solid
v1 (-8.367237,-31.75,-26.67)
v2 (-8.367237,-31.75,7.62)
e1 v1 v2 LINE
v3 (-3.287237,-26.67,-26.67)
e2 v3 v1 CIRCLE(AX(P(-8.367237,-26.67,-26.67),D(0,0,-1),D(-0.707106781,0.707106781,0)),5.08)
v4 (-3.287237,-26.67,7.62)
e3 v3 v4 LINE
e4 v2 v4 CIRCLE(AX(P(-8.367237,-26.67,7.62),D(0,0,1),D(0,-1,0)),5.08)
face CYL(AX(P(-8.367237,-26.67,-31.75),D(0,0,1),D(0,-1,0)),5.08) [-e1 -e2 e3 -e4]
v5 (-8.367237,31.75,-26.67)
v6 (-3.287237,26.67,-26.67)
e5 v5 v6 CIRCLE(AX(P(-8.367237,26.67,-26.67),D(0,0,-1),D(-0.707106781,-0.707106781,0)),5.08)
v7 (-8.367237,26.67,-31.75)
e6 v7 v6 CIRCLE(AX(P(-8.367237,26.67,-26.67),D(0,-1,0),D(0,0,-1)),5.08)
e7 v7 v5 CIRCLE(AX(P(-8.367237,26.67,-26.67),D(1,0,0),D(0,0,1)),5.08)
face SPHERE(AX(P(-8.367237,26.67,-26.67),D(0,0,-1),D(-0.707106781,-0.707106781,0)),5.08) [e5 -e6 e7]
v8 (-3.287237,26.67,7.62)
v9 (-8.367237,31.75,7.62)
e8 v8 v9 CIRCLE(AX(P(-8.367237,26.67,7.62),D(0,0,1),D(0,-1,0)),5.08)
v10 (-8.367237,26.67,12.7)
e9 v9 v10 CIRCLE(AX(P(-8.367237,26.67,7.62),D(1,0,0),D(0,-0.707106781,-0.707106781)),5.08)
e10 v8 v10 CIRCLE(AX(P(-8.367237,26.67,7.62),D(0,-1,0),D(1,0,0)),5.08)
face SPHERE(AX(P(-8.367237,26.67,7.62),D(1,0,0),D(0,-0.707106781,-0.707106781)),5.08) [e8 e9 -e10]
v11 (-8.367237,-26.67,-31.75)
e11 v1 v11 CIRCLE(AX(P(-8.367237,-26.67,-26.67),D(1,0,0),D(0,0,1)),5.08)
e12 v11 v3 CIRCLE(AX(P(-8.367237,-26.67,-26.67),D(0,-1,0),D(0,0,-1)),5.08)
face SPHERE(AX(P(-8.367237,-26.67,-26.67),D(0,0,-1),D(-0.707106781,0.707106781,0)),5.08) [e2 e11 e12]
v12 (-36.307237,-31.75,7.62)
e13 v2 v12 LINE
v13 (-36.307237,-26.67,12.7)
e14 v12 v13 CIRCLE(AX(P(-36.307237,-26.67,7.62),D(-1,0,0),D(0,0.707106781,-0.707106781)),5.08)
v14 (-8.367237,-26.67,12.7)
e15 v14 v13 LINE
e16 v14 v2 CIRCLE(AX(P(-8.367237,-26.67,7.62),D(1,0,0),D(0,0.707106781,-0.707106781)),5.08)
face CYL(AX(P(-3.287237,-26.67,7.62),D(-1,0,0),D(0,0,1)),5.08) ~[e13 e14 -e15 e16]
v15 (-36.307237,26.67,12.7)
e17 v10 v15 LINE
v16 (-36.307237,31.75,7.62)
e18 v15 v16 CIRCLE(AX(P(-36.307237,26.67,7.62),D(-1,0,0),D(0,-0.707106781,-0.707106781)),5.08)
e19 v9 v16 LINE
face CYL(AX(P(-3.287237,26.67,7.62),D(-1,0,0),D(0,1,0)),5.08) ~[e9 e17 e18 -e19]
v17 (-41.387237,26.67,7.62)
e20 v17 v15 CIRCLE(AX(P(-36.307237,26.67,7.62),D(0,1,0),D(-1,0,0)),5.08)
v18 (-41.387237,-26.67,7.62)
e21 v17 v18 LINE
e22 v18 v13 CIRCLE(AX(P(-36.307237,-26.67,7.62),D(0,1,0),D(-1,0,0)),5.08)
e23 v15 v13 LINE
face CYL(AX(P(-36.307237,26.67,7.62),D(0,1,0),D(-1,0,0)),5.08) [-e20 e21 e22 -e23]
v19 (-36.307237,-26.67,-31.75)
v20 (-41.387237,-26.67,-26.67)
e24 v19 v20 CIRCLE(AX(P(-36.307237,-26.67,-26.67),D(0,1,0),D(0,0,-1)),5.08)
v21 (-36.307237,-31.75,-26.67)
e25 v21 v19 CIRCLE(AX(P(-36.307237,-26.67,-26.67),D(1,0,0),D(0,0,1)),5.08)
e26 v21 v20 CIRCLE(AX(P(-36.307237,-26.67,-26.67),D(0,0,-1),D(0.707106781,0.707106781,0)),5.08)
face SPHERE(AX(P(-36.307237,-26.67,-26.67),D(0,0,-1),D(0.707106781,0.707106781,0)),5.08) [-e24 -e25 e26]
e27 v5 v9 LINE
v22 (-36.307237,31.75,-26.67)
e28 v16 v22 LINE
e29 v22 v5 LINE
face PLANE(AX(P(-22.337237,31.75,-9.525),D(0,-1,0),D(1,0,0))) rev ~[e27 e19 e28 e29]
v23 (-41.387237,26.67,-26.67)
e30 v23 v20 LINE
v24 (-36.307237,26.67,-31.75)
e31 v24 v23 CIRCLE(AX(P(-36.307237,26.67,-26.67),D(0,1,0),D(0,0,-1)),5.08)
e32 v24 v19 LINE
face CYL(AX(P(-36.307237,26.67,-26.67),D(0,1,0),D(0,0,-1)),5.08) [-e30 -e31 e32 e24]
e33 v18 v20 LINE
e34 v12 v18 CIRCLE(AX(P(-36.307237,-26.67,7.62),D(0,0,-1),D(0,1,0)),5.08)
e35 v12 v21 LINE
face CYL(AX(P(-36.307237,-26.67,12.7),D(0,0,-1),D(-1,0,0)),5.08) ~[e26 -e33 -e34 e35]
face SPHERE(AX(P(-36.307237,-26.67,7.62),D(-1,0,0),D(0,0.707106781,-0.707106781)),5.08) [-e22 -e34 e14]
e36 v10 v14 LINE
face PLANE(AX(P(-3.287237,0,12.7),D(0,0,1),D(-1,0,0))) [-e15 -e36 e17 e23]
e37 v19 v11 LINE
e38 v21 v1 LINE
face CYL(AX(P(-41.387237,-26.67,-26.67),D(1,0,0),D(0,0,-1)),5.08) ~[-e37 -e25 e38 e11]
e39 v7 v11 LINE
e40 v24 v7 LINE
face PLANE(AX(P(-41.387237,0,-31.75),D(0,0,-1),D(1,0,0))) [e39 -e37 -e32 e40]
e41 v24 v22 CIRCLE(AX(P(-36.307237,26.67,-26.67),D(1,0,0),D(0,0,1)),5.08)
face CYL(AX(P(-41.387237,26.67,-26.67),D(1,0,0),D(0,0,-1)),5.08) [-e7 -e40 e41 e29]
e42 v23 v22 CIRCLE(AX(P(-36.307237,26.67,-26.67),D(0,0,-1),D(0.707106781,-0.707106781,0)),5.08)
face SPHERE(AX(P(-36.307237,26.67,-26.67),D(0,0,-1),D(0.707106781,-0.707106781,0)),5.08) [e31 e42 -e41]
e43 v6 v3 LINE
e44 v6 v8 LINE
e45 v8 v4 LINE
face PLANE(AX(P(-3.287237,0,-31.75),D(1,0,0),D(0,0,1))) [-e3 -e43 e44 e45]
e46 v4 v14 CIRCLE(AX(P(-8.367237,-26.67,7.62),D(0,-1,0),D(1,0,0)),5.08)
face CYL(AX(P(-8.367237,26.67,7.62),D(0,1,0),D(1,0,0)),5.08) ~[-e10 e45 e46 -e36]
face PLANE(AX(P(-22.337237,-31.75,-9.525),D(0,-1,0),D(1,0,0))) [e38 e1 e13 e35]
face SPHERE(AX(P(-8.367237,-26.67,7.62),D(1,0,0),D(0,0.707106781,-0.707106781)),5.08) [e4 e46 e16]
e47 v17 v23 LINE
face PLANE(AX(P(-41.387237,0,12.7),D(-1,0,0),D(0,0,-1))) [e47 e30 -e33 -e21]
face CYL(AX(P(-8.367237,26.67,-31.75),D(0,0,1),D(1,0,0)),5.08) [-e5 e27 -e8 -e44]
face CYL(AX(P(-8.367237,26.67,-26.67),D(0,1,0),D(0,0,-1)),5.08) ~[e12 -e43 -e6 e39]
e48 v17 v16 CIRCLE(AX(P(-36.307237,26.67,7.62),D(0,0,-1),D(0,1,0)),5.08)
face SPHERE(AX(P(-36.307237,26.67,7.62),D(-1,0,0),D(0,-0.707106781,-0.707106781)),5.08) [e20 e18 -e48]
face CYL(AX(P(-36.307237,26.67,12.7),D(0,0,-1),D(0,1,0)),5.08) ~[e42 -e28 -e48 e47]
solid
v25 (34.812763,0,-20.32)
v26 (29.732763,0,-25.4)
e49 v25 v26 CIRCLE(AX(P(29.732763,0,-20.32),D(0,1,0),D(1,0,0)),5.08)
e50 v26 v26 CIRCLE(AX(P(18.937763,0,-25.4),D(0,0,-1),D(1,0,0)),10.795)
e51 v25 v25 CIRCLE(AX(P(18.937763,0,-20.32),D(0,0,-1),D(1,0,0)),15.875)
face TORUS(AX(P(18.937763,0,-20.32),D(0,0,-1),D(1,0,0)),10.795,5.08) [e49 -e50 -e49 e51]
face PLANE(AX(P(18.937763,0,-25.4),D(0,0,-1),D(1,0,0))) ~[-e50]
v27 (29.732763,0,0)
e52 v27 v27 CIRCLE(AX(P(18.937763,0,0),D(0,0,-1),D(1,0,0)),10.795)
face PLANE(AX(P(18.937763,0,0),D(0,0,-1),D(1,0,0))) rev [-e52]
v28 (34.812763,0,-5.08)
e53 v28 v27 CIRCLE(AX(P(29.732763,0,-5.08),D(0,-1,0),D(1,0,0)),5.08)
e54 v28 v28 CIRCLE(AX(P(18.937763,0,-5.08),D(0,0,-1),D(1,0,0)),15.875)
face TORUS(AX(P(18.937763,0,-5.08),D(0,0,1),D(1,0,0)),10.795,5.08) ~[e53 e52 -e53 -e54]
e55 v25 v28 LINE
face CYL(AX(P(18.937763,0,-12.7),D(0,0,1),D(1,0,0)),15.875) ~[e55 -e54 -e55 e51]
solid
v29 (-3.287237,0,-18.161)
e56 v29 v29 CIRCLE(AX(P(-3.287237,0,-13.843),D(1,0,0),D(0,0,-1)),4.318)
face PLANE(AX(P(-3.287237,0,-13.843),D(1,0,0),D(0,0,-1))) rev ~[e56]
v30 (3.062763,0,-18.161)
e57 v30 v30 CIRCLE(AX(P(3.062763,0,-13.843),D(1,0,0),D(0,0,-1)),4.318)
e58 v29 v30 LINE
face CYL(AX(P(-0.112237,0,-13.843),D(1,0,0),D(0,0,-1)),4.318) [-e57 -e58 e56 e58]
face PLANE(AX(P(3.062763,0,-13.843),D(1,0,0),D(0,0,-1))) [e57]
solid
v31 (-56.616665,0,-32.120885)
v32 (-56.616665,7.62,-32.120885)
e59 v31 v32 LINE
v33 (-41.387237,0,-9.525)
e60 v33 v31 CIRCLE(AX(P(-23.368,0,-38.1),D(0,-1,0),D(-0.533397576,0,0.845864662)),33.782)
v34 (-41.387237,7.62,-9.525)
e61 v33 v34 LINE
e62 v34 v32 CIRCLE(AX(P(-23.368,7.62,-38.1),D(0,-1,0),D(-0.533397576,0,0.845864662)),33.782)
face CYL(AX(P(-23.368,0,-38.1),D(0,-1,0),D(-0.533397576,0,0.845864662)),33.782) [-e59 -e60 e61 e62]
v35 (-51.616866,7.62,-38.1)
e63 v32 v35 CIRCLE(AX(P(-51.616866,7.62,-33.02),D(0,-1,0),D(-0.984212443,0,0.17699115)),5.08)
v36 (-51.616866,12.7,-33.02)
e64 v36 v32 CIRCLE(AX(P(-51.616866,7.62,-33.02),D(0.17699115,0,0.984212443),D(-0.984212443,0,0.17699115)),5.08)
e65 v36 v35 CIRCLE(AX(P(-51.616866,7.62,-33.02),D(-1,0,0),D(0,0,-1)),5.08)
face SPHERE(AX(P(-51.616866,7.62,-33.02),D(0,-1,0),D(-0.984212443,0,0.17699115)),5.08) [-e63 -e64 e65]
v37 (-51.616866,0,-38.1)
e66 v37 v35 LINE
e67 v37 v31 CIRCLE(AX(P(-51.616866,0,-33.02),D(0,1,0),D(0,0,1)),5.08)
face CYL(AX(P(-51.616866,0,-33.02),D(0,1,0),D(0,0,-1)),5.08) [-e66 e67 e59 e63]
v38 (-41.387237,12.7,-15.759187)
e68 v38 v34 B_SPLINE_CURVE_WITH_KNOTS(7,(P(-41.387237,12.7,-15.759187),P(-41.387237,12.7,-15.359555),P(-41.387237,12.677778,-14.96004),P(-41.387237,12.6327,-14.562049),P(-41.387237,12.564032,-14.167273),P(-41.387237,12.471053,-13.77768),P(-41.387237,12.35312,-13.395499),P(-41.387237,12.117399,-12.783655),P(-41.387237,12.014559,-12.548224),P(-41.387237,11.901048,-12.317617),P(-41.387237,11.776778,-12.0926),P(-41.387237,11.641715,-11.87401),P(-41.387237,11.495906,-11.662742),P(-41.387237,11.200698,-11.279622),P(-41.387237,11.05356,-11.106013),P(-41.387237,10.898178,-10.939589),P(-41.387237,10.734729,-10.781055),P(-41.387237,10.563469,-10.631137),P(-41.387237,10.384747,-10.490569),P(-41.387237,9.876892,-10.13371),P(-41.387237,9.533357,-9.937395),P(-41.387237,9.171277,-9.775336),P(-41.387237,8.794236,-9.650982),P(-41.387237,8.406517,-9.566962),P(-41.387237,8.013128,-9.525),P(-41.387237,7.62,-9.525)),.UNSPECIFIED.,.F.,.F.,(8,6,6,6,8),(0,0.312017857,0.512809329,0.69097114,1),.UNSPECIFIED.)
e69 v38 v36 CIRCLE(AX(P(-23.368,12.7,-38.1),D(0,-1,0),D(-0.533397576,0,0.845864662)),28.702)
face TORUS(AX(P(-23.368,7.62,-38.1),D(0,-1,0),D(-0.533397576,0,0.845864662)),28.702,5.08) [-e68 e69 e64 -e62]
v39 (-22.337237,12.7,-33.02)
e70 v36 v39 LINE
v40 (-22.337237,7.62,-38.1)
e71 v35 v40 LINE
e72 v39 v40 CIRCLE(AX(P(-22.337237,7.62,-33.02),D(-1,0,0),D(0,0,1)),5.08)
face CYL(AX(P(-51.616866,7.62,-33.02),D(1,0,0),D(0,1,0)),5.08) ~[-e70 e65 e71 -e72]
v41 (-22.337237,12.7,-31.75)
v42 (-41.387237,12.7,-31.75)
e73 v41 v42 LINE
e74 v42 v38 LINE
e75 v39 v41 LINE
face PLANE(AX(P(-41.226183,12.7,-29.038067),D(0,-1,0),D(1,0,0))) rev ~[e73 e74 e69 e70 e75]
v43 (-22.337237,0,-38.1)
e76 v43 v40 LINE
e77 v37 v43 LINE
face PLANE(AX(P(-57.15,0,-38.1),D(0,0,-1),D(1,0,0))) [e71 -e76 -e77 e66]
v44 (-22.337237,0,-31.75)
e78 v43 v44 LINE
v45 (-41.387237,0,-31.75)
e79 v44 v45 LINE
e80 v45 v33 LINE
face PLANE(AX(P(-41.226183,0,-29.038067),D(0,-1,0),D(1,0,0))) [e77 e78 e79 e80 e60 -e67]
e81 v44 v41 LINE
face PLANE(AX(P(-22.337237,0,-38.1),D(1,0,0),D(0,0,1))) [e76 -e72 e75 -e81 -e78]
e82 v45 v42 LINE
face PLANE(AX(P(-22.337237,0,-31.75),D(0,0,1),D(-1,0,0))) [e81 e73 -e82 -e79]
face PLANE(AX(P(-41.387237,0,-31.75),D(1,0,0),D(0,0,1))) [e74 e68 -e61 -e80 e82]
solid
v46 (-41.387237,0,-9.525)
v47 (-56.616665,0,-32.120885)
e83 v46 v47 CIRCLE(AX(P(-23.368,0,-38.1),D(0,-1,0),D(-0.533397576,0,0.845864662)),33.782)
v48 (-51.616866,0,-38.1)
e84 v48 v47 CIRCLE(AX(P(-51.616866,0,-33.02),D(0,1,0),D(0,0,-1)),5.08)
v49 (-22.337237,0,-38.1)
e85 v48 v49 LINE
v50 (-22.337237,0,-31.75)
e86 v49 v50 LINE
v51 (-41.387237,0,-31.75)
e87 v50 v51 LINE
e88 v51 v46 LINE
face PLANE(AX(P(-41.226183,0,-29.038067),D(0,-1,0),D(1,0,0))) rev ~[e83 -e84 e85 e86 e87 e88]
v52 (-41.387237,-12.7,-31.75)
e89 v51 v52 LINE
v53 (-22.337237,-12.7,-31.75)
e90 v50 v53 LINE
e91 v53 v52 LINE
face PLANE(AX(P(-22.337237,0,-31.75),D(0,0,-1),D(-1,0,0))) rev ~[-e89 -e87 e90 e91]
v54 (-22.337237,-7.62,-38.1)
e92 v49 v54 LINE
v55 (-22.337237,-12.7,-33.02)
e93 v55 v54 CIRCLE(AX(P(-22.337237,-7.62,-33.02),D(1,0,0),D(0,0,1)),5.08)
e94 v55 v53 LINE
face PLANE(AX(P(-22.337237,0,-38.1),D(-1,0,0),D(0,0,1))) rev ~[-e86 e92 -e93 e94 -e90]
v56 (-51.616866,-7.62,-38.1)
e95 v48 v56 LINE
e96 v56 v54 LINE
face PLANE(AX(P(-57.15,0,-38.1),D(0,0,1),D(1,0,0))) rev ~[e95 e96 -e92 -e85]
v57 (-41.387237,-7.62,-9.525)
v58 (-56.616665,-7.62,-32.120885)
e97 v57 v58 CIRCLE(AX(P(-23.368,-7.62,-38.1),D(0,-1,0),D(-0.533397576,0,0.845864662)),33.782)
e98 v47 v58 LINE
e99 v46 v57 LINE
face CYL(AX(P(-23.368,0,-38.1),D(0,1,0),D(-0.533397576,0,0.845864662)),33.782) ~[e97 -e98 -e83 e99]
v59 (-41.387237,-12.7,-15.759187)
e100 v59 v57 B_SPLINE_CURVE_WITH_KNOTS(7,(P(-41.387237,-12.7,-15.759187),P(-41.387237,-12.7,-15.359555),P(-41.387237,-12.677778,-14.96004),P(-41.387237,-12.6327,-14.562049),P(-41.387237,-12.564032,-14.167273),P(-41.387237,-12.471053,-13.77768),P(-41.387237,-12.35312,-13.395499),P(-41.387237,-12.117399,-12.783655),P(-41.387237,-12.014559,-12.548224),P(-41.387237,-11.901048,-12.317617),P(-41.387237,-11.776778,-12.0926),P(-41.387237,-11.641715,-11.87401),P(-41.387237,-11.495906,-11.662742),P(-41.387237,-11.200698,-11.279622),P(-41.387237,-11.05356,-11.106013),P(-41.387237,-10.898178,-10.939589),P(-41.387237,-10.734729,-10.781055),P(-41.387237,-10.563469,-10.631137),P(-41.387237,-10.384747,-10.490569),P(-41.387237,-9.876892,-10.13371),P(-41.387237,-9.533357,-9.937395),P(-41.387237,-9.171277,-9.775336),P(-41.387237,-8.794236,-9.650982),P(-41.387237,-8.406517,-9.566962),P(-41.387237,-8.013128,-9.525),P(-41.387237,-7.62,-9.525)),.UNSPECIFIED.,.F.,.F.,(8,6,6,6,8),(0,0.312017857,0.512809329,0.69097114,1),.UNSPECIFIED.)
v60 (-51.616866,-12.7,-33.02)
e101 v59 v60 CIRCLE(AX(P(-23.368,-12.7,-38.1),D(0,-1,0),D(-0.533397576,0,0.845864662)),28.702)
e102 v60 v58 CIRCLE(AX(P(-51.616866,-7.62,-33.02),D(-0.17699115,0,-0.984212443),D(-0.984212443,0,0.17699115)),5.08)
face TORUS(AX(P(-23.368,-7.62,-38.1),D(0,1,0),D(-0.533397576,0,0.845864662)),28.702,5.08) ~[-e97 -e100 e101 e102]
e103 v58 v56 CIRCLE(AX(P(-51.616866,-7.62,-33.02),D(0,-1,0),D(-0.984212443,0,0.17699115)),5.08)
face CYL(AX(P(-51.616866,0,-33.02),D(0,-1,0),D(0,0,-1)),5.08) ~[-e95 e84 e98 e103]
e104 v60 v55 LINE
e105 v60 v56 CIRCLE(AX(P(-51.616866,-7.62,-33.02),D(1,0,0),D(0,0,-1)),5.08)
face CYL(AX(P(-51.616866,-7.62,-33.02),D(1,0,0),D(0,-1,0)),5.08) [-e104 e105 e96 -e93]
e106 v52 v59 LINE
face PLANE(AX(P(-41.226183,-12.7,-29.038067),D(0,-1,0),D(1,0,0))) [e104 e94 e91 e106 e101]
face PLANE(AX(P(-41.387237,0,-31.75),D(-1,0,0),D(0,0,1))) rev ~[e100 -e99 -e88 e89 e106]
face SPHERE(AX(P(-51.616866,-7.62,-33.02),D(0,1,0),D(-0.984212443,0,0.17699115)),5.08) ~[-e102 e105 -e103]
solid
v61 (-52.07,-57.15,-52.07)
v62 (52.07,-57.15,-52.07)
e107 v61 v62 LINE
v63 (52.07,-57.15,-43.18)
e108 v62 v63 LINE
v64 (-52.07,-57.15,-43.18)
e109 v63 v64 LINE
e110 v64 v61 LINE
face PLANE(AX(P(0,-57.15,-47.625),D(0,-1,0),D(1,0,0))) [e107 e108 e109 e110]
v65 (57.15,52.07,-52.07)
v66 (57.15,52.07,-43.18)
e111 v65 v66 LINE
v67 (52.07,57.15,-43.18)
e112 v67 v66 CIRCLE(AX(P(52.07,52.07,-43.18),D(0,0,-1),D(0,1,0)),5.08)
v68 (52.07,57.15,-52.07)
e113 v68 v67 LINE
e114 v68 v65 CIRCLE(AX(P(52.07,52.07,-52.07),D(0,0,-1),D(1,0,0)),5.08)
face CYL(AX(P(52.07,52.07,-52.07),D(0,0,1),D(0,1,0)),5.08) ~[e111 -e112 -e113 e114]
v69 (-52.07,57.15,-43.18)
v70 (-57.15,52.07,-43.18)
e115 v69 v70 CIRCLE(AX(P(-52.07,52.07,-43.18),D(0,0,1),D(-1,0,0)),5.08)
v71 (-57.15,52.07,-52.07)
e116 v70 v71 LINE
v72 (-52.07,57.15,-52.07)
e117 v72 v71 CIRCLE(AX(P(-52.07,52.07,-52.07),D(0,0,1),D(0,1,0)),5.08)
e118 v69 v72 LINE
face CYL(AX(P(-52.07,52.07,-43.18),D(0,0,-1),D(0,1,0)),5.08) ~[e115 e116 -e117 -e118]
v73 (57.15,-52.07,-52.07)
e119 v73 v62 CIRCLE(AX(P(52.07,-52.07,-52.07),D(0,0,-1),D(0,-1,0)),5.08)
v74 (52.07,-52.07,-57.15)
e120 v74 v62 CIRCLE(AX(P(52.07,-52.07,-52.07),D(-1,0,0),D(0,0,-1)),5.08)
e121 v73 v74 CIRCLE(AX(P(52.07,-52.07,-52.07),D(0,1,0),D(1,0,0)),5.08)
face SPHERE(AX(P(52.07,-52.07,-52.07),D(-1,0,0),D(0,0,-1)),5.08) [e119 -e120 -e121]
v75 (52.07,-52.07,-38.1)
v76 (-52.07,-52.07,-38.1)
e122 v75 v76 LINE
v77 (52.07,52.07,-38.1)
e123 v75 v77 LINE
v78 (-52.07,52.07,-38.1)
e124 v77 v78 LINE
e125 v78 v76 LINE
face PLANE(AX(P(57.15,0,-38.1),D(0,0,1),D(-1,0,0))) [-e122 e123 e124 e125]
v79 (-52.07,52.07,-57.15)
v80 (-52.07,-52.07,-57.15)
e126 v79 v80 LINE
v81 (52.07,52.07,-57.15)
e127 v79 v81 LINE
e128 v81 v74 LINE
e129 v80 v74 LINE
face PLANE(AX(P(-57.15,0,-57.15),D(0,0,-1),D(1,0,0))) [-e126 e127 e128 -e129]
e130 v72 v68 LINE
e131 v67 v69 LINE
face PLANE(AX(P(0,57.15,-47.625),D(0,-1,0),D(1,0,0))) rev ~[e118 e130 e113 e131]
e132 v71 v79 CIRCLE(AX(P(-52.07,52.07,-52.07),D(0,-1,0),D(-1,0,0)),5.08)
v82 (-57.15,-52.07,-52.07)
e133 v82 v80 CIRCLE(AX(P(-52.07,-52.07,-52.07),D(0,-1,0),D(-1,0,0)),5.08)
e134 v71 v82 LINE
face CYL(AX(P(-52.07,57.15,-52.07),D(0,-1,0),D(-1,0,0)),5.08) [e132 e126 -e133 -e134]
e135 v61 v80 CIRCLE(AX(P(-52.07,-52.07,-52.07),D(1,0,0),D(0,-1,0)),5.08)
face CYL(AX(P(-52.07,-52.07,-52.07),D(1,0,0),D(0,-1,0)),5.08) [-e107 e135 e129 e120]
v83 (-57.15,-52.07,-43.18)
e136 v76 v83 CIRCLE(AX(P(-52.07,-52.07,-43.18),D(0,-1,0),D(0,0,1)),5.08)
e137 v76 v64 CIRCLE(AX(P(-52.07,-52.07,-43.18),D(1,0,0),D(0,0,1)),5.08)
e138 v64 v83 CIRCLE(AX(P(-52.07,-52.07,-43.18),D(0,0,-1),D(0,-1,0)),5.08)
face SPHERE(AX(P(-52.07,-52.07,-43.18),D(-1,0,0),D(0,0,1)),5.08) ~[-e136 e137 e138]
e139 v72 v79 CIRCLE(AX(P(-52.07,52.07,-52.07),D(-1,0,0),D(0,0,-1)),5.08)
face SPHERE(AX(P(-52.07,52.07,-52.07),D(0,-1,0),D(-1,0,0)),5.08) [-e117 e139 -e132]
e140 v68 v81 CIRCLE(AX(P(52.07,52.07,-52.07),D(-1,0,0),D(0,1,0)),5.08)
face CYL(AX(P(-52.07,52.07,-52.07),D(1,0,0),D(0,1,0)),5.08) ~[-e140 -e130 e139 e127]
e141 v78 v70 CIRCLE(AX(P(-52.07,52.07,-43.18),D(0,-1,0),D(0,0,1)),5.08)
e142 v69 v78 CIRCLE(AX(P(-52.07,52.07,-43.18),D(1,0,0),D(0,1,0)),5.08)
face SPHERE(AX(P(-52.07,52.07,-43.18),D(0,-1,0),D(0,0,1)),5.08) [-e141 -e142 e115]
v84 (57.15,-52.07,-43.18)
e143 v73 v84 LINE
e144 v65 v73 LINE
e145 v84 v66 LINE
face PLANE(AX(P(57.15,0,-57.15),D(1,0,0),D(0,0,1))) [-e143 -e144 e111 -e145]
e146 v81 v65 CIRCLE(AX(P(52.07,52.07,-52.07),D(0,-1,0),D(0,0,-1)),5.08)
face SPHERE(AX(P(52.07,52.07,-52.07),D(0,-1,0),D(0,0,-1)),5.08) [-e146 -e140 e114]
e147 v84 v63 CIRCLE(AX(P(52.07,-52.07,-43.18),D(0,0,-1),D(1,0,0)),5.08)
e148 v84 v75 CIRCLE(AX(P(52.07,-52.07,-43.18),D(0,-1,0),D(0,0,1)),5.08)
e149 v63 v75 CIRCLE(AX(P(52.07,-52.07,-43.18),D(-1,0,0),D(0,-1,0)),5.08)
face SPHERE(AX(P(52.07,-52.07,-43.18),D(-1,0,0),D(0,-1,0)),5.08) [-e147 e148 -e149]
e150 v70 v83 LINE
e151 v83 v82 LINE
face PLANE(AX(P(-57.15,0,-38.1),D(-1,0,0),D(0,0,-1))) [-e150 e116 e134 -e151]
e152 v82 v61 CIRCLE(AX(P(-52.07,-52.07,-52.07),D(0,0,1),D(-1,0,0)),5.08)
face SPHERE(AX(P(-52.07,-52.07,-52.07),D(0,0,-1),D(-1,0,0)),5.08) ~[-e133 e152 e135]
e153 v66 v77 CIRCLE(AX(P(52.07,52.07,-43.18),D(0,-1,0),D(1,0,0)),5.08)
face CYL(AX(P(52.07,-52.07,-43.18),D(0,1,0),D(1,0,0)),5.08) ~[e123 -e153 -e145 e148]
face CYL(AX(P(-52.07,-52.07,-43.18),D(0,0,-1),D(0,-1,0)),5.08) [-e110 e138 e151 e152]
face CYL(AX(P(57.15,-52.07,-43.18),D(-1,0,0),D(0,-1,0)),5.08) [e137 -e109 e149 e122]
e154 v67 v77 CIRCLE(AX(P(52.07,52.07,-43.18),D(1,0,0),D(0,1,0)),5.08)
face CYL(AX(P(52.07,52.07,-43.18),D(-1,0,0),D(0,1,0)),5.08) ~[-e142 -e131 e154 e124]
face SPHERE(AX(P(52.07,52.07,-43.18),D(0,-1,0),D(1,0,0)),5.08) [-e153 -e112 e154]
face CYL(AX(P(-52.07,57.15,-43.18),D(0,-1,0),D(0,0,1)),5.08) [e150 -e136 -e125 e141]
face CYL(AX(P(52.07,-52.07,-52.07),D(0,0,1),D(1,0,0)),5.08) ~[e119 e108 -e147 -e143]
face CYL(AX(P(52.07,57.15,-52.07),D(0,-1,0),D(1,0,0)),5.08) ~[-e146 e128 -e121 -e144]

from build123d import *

# Parameters (mm, degrees)
F1_DEPTH      = 57.15
F2_DEPTH      = 57.15
F3_DEPTH      = 31.75
F4_DEPTH      = 31.75
F0_W          = 15.875
F0_H          = 25.4
F6_DEPTH      = 12.7
F7_DEPTH      = 12.7
F0_W_2        = 6.35
F0_H_2        = 4.318
F9_R          = 5.08
F10_R         = 5.08
F11_R         = 5.08
F12_R         = 5.08
F13_R         = 5.08
F13_2_R       = 5.08
F14_R         = 5.08
F15_R         = 5.08
F15_2_R       = 5.08
F16_R         = 5.08
F17_R         = 5.08
F18_R         = 5.08
F19_R         = 5.08
F20_T1_DEPTH  = 53.34
F20_S5_W      = 5.08
F20_S5_H      = 5.08
F20_T6_DEPTH  = 5.08
F20_S11_W     = 5.08
F20_S11_H     = 5.08
F20_T12_DEPTH = 5.08
F20_S17_W     = 5.08
F20_S17_H     = 5.08
F20_T18_DEPTH = 5.08
F20_S23_W     = 5.08
F20_S23_H     = 5.08
F20_T24_DEPTH = 5.08
F21_T1_DEPTH  = 53.34
F21_S5_W      = 5.08
F21_S5_H      = 5.08
F21_T6_DEPTH  = 5.08
F21_S11_W     = 5.08
F21_S11_H     = 5.08
F21_T12_DEPTH = 5.08
F21_S17_W     = 5.08
F21_S17_H     = 5.08
F21_T18_DEPTH = 5.08
F21_S23_W     = 5.08
F21_S23_H     = 5.08
F21_T24_DEPTH = 5.08


# Not quite as in the source:
# - a fillet or chamfer that OpenCascade refuses, or shapes differently, is made with other operations: its cross-section is extruded or revolved along the edge and cut away or added


with BuildPart() as f1:
    # F0 (on Front) → F1 (new body)
    with BuildSketch(Plane.XZ):
        Polygon((57.15, -57.15), (57.15, -38.1), (-22.337236915, -38.1), (-57.15, -38.1), (-57.15, -57.15), align=None)
    extrude(amount=F1_DEPTH)

    # F2 (add): a face of the model
    f2_faces = [f1.faces().sort_by_distance(p)[0] for p in [
        (0, 0, -47.625),
    ]]
    extrude(f2_faces, amount=F2_DEPTH)

    # F9
    f9_edges = [f1.edges().sort_by_distance(p)[0] for p in [
        (0, -57.15, -38.1),
    ]]
    fillet(f9_edges, radius=F9_R)

    # F10
    f10_edges = [f1.edges().sort_by_distance(p)[0] for p in [
        (-57.15, -57.15, -50.165),
    ]]
    fillet(f10_edges, radius=F10_R)

    # F11
    f11_edges = [f1.edges().sort_by_distance(p)[0] for p in [
        (2.54, -57.15, -57.15),
    ]]
    fillet(f11_edges, radius=F11_R)

    # F12
    f12_edges = [f1.edges().sort_by_distance(p)[0] for p in [
        (57.15, -57.15, -47.625),
    ]]
    fillet(f12_edges, radius=F12_R)

    # F14
    f14_edges = [f1.edges().sort_by_distance(p)[0] for p in [
        (0, 57.15, -38.1),
    ]]
    fillet(f14_edges, radius=F14_R)


with BuildPart() as f3:
    # F0 (on Front) → F3 (new body)
    with BuildSketch(Plane.XZ):
        Polygon((-41.387236915, -31.75), (-22.337236915, -31.75), (-3.287236915, -31.75), (-3.287236915, -18.161), (-3.287236915, -13.843), (-3.287236915, -9.525), (-3.287236915, 12.7), (-41.387236915, 12.7), (-41.387236915, -9.525), align=None)
    extrude(amount=F3_DEPTH)

    # F0 (on Front) → F4 (join)
    with BuildSketch(Plane.XZ):
        Polygon((-41.387236915, -31.75), (-22.337236915, -31.75), (-3.287236915, -31.75), (-3.287236915, -18.161), (-3.287236915, -13.843), (-3.287236915, -9.525), (-3.287236915, 12.7), (-41.387236915, 12.7), (-41.387236915, -9.525), align=None)
    extrude(amount=-F4_DEPTH)

    # F16
    f16_edges = [f3.edges().sort_by_distance(p)[0] for p in [
        (-41.387237, -31.75, -9.525),
        (-22.337237, -31.75, 12.7),
        (-3.287237, -31.75, -9.525),
        (-22.337237, -31.75, -31.75),
    ]]
    fillet(f16_edges, radius=F16_R)

    # F19
    f19_edges = [f3.edges().sort_by_distance(p)[0] for p in [
        (-22.337237, 31.75, 12.7),
        (-41.387237, 31.75, -9.525),
        (-22.337237, 31.75, -31.75),
        (-3.287237, 31.75, -9.525),
    ]]
    fillet(f19_edges, radius=F19_R)

    # F20: fillet of radius 5.08 on 2 edges, made by hand

    # F20_s2 → F20_t1 (cut)
    with BuildSketch(Plane.XZ.offset(-26.67)):
        with BuildLine():
            ThreePointArc((-3.287236915, 7.62), (-4.7751344666, 11.2121024484), (-8.367236915, 12.7))
            Line((-8.367236915, 12.7), (-3.287236915, 12.7))
            Line((-3.287236915, 12.7), (-3.287236915, 7.62))
        make_face()
        with BuildLine():
            ThreePointArc((-41.387236915, 7.62), (-39.8993393635, 11.2121024484), (-36.307236915, 12.7))
            Line((-36.307236915, 12.7), (-41.387236915, 12.7))
            Line((-41.387236915, 12.7), (-41.387236915, 7.62))
        make_face()
    extrude(amount=F20_T1_DEPTH, mode=Mode.SUBTRACT)


with BuildPart() as f5:
    # F0 (on Front) → F5 (revolve)
    with BuildSketch(Plane.XZ):
        with Locations((26.875263085, -12.7)):
            Rectangle(F0_W, F0_H)
    revolve(axis=Axis((18.937763085, 0, -12.7), (0, 0, -1)))

    # F17
    f17_edges = [f5.edges().sort_by_distance(p)[0] for p in [
        (3.062763, 0, 0),
    ]]
    fillet(f17_edges, radius=F17_R)

    # F18
    f18_edges = [f5.edges().sort_by_distance(p)[0] for p in [
        (3.062763, 0, -25.4),
    ]]
    fillet(f18_edges, radius=F18_R)


with BuildPart() as f6:
    # F0 (on Front) → F6 (new body)
    with BuildSketch(Plane.XZ):
        with BuildLine():
            Line((-57.15, -38.1), (-22.337236915, -38.1))
            Line((-22.337236915, -38.1), (-22.337236915, -31.75))
            Line((-22.337236915, -31.75), (-41.387236915, -31.75))
            Line((-41.387236915, -31.75), (-41.387236915, -9.525))
            ThreePointArc((-41.387236915, -9.525), (-52.9479711415, -21.7828669409), (-57.15, -38.1))
        make_face()
    extrude(amount=F6_DEPTH)

    # F13
    f13_edges = [f6.edges().sort_by_distance(p)[0] for p in [
        (-57.15, -6.35, -38.1),
    ]]
    fillet(f13_edges, radius=F13_R)

    # F15
    f15_edges = [f6.edges().sort_by_distance(p)[0] for p in [
        (-51.381264, -12.7, -19.219307),
    ]]
    fillet(f15_edges, radius=F15_R)


with BuildPart() as f7:
    # F0 (on Front) → F7 (new body)
    with BuildSketch(Plane.XZ):
        with BuildLine():
            Line((-57.15, -38.1), (-22.337236915, -38.1))
            Line((-22.337236915, -38.1), (-22.337236915, -31.75))
            Line((-22.337236915, -31.75), (-41.387236915, -31.75))
            Line((-41.387236915, -31.75), (-41.387236915, -9.525))
            ThreePointArc((-41.387236915, -9.525), (-52.9479711415, -21.7828669409), (-57.15, -38.1))
        make_face()
    extrude(amount=-F7_DEPTH)

    # F13#2
    f13_2_edges = [f7.edges().sort_by_distance(p)[0] for p in [
        (-57.15, 6.35, -38.1),
    ]]
    fillet(f13_2_edges, radius=F13_2_R)

    # F15#2
    f15_2_edges = [f7.edges().sort_by_distance(p)[0] for p in [
        (-51.381264, 12.7, -19.219307),
    ]]
    fillet(f15_2_edges, radius=F15_2_R)


with BuildPart() as f8:
    # F0 (on Front) → F8 (revolve)
    with BuildSketch(Plane.XZ):
        with Locations((-0.112236915, -16.002)):
            Rectangle(F0_W_2, F0_H_2)
    revolve(axis=Axis((-0.112236915, 0, -13.843), (1, 0, 0)))


with BuildPart() as f20_tool4:
    # F20_s5 → F20_t6 (new body)
    with BuildSketch(Plane.YZ.offset(-36.307236915)):
        with Locations((-29.21, 10.16)):
            Rectangle(F20_S5_W, F20_S5_H)
    extrude(amount=-F20_T6_DEPTH)

    # F20_s7 → F20_t8 (revolve, cut)
    with BuildSketch(Plane(origin=(-36.307236915, -26.67, 7.62), x_dir=(0, 0.7071067812, -0.7071067812), z_dir=(0, 0.7071067812, 0.7071067812))):
        with BuildLine():
            ThreePointArc((0, -5.08), (5.08, 0), (0, 5.08))
            Line((0, 5.08), (0, -5.08))
        make_face()
    revolve(axis=Axis((-36.307236915, -26.67, 7.62), (-1, 0, 0)), mode=Mode.SUBTRACT)


with BuildPart() as f3_1:
    add(f3.part)

    # F20_t3: cut F20_tool4
    add(f20_tool4.part, mode=Mode.SUBTRACT)


with BuildPart() as f20_tool10:
    # F20_s11 → F20_t12 (new body)
    with BuildSketch(Plane.YZ.offset(-36.307236915)):
        with Locations((29.21, 10.16)):
            Rectangle(F20_S11_W, F20_S11_H)
    extrude(amount=-F20_T12_DEPTH)

    # F20_s13 → F20_t14 (revolve, cut)
    with BuildSketch(Plane(origin=(-36.307236915, 26.67, 7.62), x_dir=(0, -0.7071067812, -0.7071067812), z_dir=(0, 0.7071067812, -0.7071067812))):
        with BuildLine():
            ThreePointArc((0, -5.08), (5.08, 0), (0, 5.08))
            Line((0, 5.08), (0, -5.08))
        make_face()
    revolve(axis=Axis((-36.307236915, 26.67, 7.62), (-1, 0, 0)), mode=Mode.SUBTRACT)


with BuildPart() as f3_2:
    add(f3_1.part)

    # F20_t9: cut F20_tool10
    add(f20_tool10.part, mode=Mode.SUBTRACT)


with BuildPart() as f20_tool16:
    # F20_s17 → F20_t18 (new body)
    with BuildSketch(Plane.YZ.offset(-8.367236915)):
        with Locations((29.21, 10.16)):
            Rectangle(F20_S17_W, F20_S17_H)
    extrude(amount=F20_T18_DEPTH)

    # F20_s19 → F20_t20 (revolve, cut)
    with BuildSketch(Plane(origin=(-8.367236915, 26.67, 7.62), x_dir=(0, -0.7071067812, -0.7071067812), z_dir=(0, -0.7071067812, 0.7071067812))):
        with BuildLine():
            ThreePointArc((0, -5.08), (5.08, 0), (0, 5.08))
            Line((0, 5.08), (0, -5.08))
        make_face()
    revolve(axis=Axis((-8.367236915, 26.67, 7.62), (1, 0, 0)), mode=Mode.SUBTRACT)


with BuildPart() as f3_3:
    add(f3_2.part)

    # F20_t15: cut F20_tool16
    add(f20_tool16.part, mode=Mode.SUBTRACT)


with BuildPart() as f20_tool22:
    # F20_s23 → F20_t24 (new body)
    with BuildSketch(Plane.YZ.offset(-8.367236915)):
        with Locations((-29.21, 10.16)):
            Rectangle(F20_S23_W, F20_S23_H)
    extrude(amount=F20_T24_DEPTH)

    # F20_s25 → F20_t26 (revolve, cut)
    with BuildSketch(Plane(origin=(-8.367236915, -26.67, 7.62), x_dir=(0, 0.7071067812, -0.7071067812), z_dir=(0, -0.7071067812, -0.7071067812))):
        with BuildLine():
            ThreePointArc((0, -5.08), (5.08, 0), (0, 5.08))
            Line((0, 5.08), (0, -5.08))
        make_face()
    revolve(axis=Axis((-8.367236915, -26.67, 7.62), (1, 0, 0)), mode=Mode.SUBTRACT)


with BuildPart() as f3_4:
    add(f3_3.part)

    # F20_t21: cut F20_tool22
    add(f20_tool22.part, mode=Mode.SUBTRACT)

    # F21: fillet of radius 5.08 on 2 edges, made by hand

    # F21_s2 → F21_t1 (cut)
    with BuildSketch(Plane.XZ.offset(-26.67)):
        with BuildLine():
            ThreePointArc((-8.367236915, -31.75), (-4.7751344666, -30.2621024484), (-3.287236915, -26.67))
            Line((-3.287236915, -26.67), (-3.287236915, -31.75))
            Line((-3.287236915, -31.75), (-8.367236915, -31.75))
        make_face()
        with BuildLine():
            ThreePointArc((-36.307236915, -31.75), (-39.8993393635, -30.2621024484), (-41.387236915, -26.67))
            Line((-41.387236915, -26.67), (-41.387236915, -31.75))
            Line((-41.387236915, -31.75), (-36.307236915, -31.75))
        make_face()
    extrude(amount=F21_T1_DEPTH, mode=Mode.SUBTRACT)


with BuildPart() as f21_tool4:
    # F21_s5 → F21_t6 (new body)
    with BuildSketch(Plane.XY.offset(-26.67)):
        with Locations((-38.847236915, -29.21)):
            Rectangle(F21_S5_W, F21_S5_H)
    extrude(amount=-F21_T6_DEPTH)

    # F21_s7 → F21_t8 (revolve, cut)
    with BuildSketch(Plane(origin=(-36.307236915, -26.67, -26.67), x_dir=(0.7071067812, 0.7071067812, 0), z_dir=(-0.7071067812, 0.7071067812, 0))):
        with BuildLine():
            ThreePointArc((0, -5.08), (5.08, 0), (0, 5.08))
            Line((0, 5.08), (0, -5.08))
        make_face()
    revolve(axis=Axis((-36.307236915, -26.67, -26.67), (0, 0, -1)), mode=Mode.SUBTRACT)


with BuildPart() as f3_5:
    add(f3_4.part)

    # F21_t3: cut F21_tool4
    add(f21_tool4.part, mode=Mode.SUBTRACT)


with BuildPart() as f21_tool10:
    # F21_s11 → F21_t12 (new body)
    with BuildSketch(Plane.XY.offset(-26.67)):
        with Locations((-38.847236915, 29.21)):
            Rectangle(F21_S11_W, F21_S11_H)
    extrude(amount=-F21_T12_DEPTH)

    # F21_s13 → F21_t14 (revolve, cut)
    with BuildSketch(Plane(origin=(-36.307236915, 26.67, -26.67), x_dir=(0.7071067812, -0.7071067812, 0), z_dir=(0.7071067812, 0.7071067812, 0))):
        with BuildLine():
            ThreePointArc((0, -5.08), (5.08, 0), (0, 5.08))
            Line((0, 5.08), (0, -5.08))
        make_face()
    revolve(axis=Axis((-36.307236915, 26.67, -26.67), (0, 0, -1)), mode=Mode.SUBTRACT)


with BuildPart() as f3_6:
    add(f3_5.part)

    # F21_t9: cut F21_tool10
    add(f21_tool10.part, mode=Mode.SUBTRACT)


with BuildPart() as f21_tool16:
    # F21_s17 → F21_t18 (new body)
    with BuildSketch(Plane.XY.offset(-26.67)):
        with Locations((-5.827236915, 29.21)):
            Rectangle(F21_S17_W, F21_S17_H)
    extrude(amount=-F21_T18_DEPTH)

    # F21_s19 → F21_t20 (revolve, cut)
    with BuildSketch(Plane(origin=(-8.367236915, 26.67, -26.67), x_dir=(-0.7071067812, -0.7071067812, 0), z_dir=(0.7071067812, -0.7071067812, 0))):
        with BuildLine():
            ThreePointArc((0, -5.08), (5.08, 0), (0, 5.08))
            Line((0, 5.08), (0, -5.08))
        make_face()
    revolve(axis=Axis((-8.367236915, 26.67, -26.67), (0, 0, -1)), mode=Mode.SUBTRACT)


with BuildPart() as f3_7:
    add(f3_6.part)

    # F21_t15: cut F21_tool16
    add(f21_tool16.part, mode=Mode.SUBTRACT)


with BuildPart() as f21_tool22:
    # F21_s23 → F21_t24 (new body)
    with BuildSketch(Plane.XY.offset(-26.67)):
        with Locations((-5.827236915, -29.21)):
            Rectangle(F21_S23_W, F21_S23_H)
    extrude(amount=-F21_T24_DEPTH)

    # F21_s25 → F21_t26 (revolve, cut)
    with BuildSketch(Plane(origin=(-8.367236915, -26.67, -26.67), x_dir=(-0.7071067812, 0.7071067812, 0), z_dir=(-0.7071067812, -0.7071067812, 0))):
        with BuildLine():
            ThreePointArc((0, -5.08), (5.08, 0), (0, 5.08))
            Line((0, 5.08), (0, -5.08))
        make_face()
    revolve(axis=Axis((-8.367236915, -26.67, -26.67), (0, 0, -1)), mode=Mode.SUBTRACT)


with BuildPart() as f3_8:
    add(f3_7.part)

    # F21_t21: cut F21_tool22
    add(f21_tool22.part, mode=Mode.SUBTRACT)


solid = Compound([f1.part, f5.part, f6.part, f7.part, f8.part, f3_8.part])
